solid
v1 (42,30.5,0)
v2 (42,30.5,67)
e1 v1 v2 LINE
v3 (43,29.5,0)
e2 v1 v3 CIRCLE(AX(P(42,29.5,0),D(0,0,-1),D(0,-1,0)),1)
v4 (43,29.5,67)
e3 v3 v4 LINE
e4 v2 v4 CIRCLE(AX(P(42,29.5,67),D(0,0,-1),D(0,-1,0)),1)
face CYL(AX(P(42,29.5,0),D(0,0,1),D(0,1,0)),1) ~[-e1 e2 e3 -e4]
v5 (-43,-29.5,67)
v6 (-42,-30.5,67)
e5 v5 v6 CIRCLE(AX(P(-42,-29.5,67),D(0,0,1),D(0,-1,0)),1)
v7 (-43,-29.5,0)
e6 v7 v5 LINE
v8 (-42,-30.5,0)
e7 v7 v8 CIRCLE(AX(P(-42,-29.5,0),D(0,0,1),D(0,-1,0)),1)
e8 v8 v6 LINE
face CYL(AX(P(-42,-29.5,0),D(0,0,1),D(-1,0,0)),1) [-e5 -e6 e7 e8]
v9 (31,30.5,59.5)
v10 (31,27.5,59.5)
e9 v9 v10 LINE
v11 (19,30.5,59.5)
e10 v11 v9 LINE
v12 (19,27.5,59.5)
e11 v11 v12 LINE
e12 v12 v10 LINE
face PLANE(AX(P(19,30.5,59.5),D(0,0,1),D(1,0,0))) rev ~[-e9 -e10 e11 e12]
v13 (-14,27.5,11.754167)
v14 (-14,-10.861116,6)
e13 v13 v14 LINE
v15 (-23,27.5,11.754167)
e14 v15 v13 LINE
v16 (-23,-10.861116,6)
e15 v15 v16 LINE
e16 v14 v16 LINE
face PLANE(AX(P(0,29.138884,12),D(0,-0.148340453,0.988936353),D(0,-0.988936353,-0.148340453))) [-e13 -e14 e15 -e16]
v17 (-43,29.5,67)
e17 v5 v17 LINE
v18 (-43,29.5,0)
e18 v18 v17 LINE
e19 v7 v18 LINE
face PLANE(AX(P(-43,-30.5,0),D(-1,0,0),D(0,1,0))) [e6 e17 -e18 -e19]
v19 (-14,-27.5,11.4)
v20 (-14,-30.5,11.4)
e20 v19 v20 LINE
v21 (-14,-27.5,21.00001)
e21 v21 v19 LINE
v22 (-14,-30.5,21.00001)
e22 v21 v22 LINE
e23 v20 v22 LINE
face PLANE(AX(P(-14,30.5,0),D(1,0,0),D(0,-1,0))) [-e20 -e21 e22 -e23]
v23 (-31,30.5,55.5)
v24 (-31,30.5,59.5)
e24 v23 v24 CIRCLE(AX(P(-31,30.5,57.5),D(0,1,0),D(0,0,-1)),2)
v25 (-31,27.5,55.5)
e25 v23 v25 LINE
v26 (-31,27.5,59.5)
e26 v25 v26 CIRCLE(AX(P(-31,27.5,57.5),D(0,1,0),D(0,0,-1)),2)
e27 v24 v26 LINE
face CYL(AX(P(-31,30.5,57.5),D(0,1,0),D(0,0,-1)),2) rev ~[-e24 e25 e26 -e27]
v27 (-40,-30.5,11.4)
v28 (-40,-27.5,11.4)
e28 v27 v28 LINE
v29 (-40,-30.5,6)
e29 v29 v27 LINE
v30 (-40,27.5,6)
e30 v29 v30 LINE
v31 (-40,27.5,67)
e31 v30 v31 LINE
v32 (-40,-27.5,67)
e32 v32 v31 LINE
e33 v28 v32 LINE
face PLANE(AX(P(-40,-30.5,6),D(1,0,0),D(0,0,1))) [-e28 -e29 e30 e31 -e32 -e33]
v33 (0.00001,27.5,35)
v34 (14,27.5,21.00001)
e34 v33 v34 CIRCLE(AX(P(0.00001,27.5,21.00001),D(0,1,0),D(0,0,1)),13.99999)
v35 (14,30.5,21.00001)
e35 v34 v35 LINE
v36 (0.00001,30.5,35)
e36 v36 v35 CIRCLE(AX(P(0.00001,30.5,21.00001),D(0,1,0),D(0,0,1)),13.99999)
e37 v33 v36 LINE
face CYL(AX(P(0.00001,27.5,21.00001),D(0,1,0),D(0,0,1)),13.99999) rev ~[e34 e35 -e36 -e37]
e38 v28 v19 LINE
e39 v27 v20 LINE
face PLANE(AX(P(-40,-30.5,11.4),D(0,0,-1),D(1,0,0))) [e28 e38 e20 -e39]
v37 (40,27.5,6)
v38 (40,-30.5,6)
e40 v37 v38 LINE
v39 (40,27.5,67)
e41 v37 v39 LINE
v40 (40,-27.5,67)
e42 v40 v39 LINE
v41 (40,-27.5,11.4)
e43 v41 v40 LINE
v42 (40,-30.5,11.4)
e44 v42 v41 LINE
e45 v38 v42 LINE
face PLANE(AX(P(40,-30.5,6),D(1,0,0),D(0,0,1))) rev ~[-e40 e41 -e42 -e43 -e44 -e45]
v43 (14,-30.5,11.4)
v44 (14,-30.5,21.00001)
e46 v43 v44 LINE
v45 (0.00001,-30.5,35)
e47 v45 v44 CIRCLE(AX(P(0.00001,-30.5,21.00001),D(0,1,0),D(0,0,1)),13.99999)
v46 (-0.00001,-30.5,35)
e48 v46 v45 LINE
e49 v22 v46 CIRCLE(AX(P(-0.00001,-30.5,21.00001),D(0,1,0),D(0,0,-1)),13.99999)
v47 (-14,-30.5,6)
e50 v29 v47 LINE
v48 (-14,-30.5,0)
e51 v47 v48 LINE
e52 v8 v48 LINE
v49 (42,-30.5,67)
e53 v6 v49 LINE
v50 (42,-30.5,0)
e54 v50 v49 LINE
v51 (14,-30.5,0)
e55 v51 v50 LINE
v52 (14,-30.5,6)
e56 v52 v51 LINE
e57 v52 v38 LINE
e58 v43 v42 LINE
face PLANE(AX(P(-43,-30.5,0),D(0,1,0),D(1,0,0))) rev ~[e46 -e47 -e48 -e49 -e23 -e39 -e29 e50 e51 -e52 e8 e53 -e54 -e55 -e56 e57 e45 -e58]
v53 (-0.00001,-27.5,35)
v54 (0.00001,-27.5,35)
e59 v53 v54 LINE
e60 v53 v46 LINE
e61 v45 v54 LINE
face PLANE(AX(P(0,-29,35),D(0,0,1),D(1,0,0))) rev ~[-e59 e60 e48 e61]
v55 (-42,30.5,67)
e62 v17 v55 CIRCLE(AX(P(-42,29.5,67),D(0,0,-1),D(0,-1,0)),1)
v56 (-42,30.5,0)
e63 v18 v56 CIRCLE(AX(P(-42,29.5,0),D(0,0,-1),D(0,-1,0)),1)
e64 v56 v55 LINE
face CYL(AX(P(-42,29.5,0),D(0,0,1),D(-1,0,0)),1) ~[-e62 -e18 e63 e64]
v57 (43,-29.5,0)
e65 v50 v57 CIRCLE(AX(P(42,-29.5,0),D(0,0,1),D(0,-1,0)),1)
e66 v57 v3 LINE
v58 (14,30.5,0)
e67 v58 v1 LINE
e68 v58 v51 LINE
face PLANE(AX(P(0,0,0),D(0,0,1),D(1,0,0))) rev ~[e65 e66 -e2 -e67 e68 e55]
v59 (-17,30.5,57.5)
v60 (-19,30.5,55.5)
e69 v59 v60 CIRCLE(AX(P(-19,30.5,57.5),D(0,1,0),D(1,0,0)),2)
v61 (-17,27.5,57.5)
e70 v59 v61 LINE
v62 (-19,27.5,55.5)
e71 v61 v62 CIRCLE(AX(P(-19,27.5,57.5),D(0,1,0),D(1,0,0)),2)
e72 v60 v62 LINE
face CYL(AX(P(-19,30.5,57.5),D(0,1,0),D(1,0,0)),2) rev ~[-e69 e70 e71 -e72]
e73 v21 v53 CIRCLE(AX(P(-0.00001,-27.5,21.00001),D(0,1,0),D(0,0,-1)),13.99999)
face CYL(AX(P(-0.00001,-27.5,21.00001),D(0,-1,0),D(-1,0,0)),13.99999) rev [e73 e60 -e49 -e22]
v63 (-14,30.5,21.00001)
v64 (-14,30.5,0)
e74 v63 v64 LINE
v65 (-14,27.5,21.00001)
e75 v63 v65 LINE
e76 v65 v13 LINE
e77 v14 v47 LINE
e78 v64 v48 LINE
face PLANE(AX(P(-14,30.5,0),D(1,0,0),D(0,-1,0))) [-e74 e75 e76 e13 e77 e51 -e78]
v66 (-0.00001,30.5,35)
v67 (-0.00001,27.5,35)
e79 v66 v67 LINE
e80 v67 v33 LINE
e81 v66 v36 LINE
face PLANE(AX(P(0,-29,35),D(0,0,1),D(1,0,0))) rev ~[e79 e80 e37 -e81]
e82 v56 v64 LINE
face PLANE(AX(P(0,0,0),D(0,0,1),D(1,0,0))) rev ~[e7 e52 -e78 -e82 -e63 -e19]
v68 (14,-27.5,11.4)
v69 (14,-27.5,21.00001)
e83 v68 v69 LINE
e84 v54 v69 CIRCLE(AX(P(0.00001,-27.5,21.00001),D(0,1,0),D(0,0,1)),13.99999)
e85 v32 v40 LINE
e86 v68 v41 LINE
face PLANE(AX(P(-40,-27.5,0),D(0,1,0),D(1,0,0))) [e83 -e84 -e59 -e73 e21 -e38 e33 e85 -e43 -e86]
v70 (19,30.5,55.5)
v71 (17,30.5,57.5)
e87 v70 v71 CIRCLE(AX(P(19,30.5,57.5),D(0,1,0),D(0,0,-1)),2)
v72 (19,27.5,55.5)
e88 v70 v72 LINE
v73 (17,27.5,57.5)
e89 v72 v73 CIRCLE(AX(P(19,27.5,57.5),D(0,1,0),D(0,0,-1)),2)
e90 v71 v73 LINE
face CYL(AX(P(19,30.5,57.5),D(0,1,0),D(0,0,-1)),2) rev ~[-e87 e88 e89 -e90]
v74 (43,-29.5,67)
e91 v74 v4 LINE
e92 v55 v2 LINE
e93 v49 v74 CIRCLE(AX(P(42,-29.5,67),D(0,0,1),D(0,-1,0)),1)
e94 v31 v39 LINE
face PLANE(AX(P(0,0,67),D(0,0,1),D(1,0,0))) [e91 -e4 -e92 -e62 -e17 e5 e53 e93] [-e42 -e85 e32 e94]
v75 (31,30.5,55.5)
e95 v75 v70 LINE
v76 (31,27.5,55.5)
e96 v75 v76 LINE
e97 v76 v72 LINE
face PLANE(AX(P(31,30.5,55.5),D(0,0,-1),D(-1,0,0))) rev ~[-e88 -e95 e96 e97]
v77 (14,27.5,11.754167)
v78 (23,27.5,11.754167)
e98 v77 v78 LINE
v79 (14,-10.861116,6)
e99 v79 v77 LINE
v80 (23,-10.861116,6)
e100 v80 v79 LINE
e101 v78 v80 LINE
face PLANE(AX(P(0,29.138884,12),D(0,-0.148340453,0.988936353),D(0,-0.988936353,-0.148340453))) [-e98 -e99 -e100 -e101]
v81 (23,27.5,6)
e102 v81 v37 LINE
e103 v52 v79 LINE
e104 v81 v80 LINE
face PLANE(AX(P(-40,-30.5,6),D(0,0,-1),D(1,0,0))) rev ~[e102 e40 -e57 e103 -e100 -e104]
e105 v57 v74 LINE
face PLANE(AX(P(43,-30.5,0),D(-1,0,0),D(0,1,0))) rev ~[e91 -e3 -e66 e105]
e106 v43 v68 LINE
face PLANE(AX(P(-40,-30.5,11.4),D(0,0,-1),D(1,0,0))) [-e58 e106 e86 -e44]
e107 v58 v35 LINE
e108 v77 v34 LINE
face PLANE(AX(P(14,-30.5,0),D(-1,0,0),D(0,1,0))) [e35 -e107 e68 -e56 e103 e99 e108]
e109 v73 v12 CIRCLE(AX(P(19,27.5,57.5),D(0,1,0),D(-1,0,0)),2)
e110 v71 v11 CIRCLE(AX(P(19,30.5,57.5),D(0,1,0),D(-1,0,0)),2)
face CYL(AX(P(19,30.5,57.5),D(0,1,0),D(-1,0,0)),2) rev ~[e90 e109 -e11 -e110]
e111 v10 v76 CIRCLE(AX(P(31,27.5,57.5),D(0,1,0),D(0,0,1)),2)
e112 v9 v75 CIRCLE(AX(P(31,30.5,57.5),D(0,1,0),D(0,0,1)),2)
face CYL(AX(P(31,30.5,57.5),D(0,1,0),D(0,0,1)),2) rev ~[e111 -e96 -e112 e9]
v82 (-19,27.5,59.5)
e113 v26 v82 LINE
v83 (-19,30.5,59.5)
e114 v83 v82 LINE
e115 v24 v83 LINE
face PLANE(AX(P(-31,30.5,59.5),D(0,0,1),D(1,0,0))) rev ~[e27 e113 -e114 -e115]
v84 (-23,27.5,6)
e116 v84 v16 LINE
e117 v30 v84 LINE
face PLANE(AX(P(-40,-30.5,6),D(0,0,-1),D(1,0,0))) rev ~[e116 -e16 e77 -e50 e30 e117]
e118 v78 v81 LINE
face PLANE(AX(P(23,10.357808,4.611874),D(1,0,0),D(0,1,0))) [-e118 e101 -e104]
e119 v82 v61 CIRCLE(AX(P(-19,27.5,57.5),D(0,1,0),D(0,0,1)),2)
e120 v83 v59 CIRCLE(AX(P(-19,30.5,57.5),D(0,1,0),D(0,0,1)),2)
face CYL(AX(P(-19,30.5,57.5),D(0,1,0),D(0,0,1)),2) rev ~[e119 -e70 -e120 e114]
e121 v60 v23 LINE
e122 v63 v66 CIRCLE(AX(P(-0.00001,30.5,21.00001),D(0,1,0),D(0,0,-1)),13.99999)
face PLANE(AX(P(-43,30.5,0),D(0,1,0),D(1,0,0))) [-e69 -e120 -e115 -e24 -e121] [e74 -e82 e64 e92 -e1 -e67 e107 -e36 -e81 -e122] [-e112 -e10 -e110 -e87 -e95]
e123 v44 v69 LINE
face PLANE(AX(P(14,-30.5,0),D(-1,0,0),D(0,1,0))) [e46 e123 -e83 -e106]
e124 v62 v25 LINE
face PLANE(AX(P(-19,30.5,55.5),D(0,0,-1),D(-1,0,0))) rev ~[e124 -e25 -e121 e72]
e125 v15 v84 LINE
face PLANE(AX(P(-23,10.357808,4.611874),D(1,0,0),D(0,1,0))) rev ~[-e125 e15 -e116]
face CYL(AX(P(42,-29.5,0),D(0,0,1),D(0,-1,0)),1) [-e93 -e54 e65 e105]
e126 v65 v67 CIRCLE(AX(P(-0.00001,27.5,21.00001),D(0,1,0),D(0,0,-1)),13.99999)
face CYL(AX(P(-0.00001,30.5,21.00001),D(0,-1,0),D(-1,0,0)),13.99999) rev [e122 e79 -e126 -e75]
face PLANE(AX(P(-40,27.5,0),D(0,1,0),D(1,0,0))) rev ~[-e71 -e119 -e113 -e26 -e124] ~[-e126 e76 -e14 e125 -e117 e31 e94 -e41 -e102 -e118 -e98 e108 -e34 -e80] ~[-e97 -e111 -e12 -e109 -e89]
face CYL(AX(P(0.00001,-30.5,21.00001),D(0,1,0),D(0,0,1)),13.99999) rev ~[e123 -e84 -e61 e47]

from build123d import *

# Parameters (mm, degrees)
F0_W      = 86
F0_H      = 61
F0_W_2    = 80
F0_H_2    = 55
F1_DEPTH  = 67
F2_DEPTH  = 6
F3_W      = 80
F3_H      = 5.4
F4_DEPTH  = 3
F6_W      = 28
F6_H      = 3
F6_H_2    = 55
F7_DEPTH  = 35
F8_R      = 13.99999
F9_DEPTH  = 23
F10_W     = 28
F10_H     = 29.4785189629
F11_DEPTH = 25
F12_W     = 6
F12_H     = 2
F13_DEPTH = 6
F14_R     = 1


# Not quite as in the source:
# - a fillet or chamfer is up to 0.001 mm smaller than in the source, because OpenCascade refuses the exact size


with BuildPart() as f1:
    # F0 (on Top) → F1 (new body)
    with BuildSketch(Plane.XY):
        Rectangle(F0_W, F0_H)
        Rectangle(F0_W_2, F0_H_2, mode=Mode.SUBTRACT)
    extrude(amount=F1_DEPTH)

    # F0 (on Top) → F2 (join)
    with BuildSketch(Plane.XY):
        Rectangle(F0_W_2, F0_H_2)
    extrude(amount=F2_DEPTH)

    # F3 (on face) → F4 (cut)
    with BuildSketch(Plane.XZ.offset(30.5)):
        with Locations((0, 8.7)):
            Rectangle(F3_W, F3_H)
    extrude(amount=-F4_DEPTH, mode=Mode.SUBTRACT)

    # F6 (on face) → F7 (cut)
    with BuildSketch(Plane.XY):
        with Locations((0, -29)):
            Rectangle(F6_W, F6_H)
        Rectangle(F6_W, F6_H_2)
        with Locations((0, 29)):
            Rectangle(F6_W, F6_H)
    extrude(amount=F7_DEPTH, mode=Mode.SUBTRACT)

    # F8 (radius 14 in the source; OpenCascade refuses exactly that, so slightly less here)
    f8_edges = [f1.edges().sort_by_distance(p)[0] for p in [
        (14, -29, 35),
        (-14, -29, 35),
        (-14, 29, 35),
        (14, 29, 35),
    ]]
    fillet(f8_edges, radius=F8_R)

    # F5 (on Right) → F9 (join, symmetric)
    with BuildSketch(Plane.YZ):
        Polygon((-10.8611155301, 0), (29.1388844699, 0), (29.1388844699, 12), (-10.8611155301, 6), align=None)
    extrude(amount=F9_DEPTH, both=True)

    # F10 (on face) → F11 (cut)
    with BuildSketch(Plane(origin=(0, -1.1191932513, 7.4612883418), x_dir=(1, 0, 0), z_dir=(0, -0.1483404529, 0.9889363529))):
        Polygon((-14, -9.8509092629), (14, -9.8509092629), (14, 28.9393682094), (14, 30.5965875694), (-14, 30.5965875694), (-14, 28.9393682094), align=None)
        with Locations((0, -24.5901687443)):
            Rectangle(F10_W, F10_H)
    extrude(amount=-F11_DEPTH, mode=Mode.SUBTRACT)

    # F12 (on face) → F13 (cut)
    with BuildSketch(Plane(origin=(0, 30.5, 0), x_dir=(-1, 0, 0), z_dir=(0, 1, 0))):
        with BuildLine():
            Line((-31, 55.5), (-31, 59.5))
            ThreePointArc((-31, 59.5), (-33, 57.5), (-31, 55.5))
        make_face()
        Polygon((-25, 57.5), (-19, 57.5), (-19, 59.5), (-31, 59.5), (-31, 55.5), (-25, 55.5), align=None)
        with Locations((-22, 56.5)):
            Rectangle(F12_W, F12_H)
        with BuildLine():
            ThreePointArc((-19, 55.5), (-17.5857864376, 56.0857864376), (-17, 57.5))
            Line((-17, 57.5), (-19, 57.5))
            Line((-19, 57.5), (-19, 55.5))
        make_face()
        with BuildLine():
            Line((-19, 57.5), (-17, 57.5))
            ThreePointArc((-17, 57.5), (-17.5857864376, 58.9142135624), (-19, 59.5))
            Line((-19, 59.5), (-19, 57.5))
        make_face()
        with BuildLine():
            Line((19, 55.5), (19, 57.5))
            Line((19, 57.5), (17, 57.5))
            ThreePointArc((17, 57.5), (17.5857864376, 56.0857864376), (19, 55.5))
        make_face()
        with BuildLine():
            Line((17, 57.5), (19, 57.5))
            Line((19, 57.5), (19, 59.5))
            ThreePointArc((19, 59.5), (17.5857864376, 58.9142135624), (17, 57.5))
        make_face()
        Polygon((19, 57.5), (25, 57.5), (25, 55.5), (31, 55.5), (31, 59.5), (19, 59.5), align=None)
        with Locations((22, 56.5)):
            Rectangle(F12_W, F12_H)
        with BuildLine():
            Line((31, 59.5), (31, 55.5))
            ThreePointArc((31, 55.5), (33, 57.5), (31, 59.5))
        make_face()
    extrude(amount=-F13_DEPTH, mode=Mode.SUBTRACT)

    # F14
    f14_edges = [f1.edges().sort_by_distance(p)[0] for p in [
        (-43, -30.5, 33.5),
        (43, -30.5, 33.5),
        (43, 30.5, 33.5),
        (-43, 30.5, 33.5),
    ]]
    fillet(f14_edges, radius=F14_R)


solid = f1.part
